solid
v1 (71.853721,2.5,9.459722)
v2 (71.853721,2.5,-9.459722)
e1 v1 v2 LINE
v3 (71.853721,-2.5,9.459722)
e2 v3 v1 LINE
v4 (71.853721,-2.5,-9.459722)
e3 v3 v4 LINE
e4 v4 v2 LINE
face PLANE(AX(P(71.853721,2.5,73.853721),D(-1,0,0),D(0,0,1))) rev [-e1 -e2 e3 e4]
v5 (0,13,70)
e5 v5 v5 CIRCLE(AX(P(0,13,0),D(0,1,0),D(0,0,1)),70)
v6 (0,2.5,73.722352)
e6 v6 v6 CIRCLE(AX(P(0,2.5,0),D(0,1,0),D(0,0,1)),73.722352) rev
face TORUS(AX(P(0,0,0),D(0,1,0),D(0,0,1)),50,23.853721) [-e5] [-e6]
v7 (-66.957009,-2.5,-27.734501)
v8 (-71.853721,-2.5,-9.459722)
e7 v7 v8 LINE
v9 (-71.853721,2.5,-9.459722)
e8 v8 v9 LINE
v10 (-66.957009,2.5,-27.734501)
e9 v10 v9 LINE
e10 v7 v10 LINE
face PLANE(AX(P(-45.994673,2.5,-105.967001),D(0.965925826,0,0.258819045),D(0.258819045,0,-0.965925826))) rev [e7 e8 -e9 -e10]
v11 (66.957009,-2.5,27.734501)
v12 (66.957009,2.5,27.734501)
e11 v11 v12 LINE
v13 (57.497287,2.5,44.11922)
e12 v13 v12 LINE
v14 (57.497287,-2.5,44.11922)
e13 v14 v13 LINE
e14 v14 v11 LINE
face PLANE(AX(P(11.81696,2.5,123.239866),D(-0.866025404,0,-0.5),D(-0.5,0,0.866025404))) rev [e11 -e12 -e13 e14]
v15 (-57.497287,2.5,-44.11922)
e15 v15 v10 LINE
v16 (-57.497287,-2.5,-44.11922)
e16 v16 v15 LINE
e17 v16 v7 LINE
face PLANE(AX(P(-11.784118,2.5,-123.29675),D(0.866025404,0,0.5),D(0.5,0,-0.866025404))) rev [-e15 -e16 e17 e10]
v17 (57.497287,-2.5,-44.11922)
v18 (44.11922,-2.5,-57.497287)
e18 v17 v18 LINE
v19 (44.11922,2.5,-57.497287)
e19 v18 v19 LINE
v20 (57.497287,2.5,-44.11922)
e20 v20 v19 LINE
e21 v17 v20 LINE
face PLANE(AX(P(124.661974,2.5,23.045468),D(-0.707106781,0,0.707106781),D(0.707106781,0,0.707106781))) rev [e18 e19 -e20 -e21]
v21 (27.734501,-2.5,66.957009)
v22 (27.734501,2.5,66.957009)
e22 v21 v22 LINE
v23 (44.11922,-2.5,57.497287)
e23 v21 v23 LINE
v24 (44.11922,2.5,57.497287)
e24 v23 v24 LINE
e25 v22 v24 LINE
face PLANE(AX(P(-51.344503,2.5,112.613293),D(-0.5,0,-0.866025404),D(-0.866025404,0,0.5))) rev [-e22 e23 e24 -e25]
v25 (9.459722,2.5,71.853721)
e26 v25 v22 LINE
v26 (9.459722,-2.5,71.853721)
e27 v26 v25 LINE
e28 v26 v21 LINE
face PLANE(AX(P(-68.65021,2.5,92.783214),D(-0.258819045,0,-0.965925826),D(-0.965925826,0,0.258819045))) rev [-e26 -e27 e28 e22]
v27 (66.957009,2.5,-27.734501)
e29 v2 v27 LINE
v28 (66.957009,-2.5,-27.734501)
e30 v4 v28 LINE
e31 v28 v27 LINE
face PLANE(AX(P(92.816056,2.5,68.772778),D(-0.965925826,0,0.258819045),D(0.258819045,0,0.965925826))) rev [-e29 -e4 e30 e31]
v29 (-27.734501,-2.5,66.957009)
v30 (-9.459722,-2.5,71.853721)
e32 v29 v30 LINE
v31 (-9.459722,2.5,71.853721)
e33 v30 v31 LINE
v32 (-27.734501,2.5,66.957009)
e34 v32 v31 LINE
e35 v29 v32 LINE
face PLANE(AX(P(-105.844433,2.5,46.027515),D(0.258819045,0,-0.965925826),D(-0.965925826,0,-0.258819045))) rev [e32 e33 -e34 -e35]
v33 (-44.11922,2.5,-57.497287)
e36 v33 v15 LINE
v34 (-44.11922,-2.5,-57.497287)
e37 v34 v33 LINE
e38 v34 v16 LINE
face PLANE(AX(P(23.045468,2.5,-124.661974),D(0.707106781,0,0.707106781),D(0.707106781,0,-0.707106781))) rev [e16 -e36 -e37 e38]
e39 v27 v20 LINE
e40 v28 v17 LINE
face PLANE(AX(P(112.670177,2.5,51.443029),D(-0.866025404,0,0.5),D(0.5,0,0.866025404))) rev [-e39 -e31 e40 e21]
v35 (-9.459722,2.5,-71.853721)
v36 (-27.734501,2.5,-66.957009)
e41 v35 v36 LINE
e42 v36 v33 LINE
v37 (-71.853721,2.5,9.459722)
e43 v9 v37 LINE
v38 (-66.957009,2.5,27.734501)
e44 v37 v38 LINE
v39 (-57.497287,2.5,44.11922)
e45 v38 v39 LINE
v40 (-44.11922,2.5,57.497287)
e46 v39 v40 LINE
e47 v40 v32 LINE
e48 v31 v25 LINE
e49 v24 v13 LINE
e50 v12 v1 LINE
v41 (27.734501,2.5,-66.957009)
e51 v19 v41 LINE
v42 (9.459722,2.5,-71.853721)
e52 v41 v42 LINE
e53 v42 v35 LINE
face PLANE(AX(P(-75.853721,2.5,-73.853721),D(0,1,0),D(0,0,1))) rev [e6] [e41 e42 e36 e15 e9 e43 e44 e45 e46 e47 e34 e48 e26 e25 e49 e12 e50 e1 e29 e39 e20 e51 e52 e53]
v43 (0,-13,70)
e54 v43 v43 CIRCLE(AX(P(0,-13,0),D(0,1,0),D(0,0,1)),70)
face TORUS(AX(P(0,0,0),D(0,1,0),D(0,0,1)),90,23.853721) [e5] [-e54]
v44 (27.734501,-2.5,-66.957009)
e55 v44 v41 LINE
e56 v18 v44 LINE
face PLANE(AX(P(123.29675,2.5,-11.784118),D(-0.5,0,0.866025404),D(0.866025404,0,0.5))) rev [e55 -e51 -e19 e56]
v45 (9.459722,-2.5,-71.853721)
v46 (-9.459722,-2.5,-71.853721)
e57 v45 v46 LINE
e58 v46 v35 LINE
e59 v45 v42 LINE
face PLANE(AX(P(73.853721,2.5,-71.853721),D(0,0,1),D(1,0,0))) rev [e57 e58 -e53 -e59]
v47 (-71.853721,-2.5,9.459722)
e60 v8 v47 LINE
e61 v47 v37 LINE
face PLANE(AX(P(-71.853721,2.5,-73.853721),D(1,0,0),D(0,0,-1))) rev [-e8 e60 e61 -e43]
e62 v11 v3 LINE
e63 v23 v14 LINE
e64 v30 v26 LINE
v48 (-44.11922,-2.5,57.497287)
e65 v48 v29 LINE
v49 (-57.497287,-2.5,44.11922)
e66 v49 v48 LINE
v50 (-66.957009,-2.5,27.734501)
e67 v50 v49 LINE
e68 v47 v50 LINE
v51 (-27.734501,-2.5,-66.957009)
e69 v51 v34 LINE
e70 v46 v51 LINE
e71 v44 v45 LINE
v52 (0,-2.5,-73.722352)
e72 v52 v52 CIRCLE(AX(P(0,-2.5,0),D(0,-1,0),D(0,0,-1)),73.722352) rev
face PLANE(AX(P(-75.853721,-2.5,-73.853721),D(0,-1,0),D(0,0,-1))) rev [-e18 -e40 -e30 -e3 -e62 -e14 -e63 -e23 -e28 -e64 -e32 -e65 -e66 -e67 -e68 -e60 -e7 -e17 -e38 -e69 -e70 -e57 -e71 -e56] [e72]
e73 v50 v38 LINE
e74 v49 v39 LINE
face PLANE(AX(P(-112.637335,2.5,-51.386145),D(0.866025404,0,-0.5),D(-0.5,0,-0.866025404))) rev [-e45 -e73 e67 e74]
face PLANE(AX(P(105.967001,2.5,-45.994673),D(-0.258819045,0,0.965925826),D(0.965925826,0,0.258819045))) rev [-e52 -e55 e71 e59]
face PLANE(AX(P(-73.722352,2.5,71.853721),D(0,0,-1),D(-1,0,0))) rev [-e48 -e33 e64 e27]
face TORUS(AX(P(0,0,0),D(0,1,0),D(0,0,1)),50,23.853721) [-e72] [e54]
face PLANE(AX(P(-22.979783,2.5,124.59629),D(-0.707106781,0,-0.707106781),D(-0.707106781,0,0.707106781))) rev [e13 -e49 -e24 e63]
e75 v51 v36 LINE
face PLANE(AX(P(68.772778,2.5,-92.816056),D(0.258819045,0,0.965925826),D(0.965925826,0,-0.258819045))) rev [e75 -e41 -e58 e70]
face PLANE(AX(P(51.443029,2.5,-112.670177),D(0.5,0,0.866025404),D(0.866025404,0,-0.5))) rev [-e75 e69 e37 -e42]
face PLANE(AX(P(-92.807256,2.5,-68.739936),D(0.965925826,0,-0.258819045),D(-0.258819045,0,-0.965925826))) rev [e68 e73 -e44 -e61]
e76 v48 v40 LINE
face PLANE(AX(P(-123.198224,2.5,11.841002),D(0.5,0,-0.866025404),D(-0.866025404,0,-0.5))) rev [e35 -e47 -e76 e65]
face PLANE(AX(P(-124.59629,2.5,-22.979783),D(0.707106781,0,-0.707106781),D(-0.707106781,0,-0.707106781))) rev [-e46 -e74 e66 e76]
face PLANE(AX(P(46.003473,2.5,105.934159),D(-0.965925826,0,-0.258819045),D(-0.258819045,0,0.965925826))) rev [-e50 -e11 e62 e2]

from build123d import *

# Parameters (mm, degrees)
SKETCH5_W          = 4
SKETCH5_H          = 5
CUT_EXTRUDE1_DEPTH = 106.250863209
CIRPATTERN1_START  = -2.5
CIRPATTERN1_DEPTH  = 5


# Read off the part's stored shape, not the designer's step: CirPattern1
with BuildPart() as part:
    # Sketch4 → Revolve1 (revolve)
    with BuildSketch(Plane(origin=(0, 0, 0), x_dir=(0, 0, -1), z_dir=(1, 0, 0))):
        with BuildLine():
            ThreePointArc((-70, -13), (-66.146279116, 0), (-70, 13))
            ThreePointArc((-70, 13), (-73.853720884, 0), (-70, -13))
        make_face()
    revolve(axis=Axis((0, 13, 0), (0, -1, 0)))

    # Sketch5 → Cut-Extrude1 (cut, symmetric)
    with BuildSketch(Plane.XY):
        with Locations((-73.853720884, 0)):
            Rectangle(SKETCH5_W, SKETCH5_H)
    extrude(amount=CUT_EXTRUDE1_DEPTH, both=True, mode=Mode.SUBTRACT)

    # CirPattern1 outline → CirPattern1 (cut)
    with BuildSketch(Plane(origin=(0, 0, 0), x_dir=(1, 0, 0), z_dir=(0, 1, 0)).offset(CIRPATTERN1_START)):
        Polygon((-57.497286734, -44.119219847), (-66.957008549, -27.734501037), (-71.853720884, -9.459721815), (-71.853720884, -75), (75, -75), (75, 75), (-71.853720884, 75), (-71.853720884, 9.459721815), (-66.957008549, 27.734501037), (-57.497286734, 44.119219847), (-44.119219847, 57.497286734), (-27.734501037, 66.957008549), (-9.459721815, 71.853720884), (9.459721815, 71.853720884), (27.734501037, 66.957008549), (44.119219847, 57.497286734), (57.497286734, 44.119219847), (66.957008549, 27.734501037), (71.853720884, 9.459721815), (71.853720884, -9.459721815), (66.957008549, -27.734501037), (57.497286734, -44.119219847), (44.119219847, -57.497286734), (27.734501037, -66.957008549), (9.459721815, -71.853720884), (-9.459721815, -71.853720884), (-27.734501037, -66.957008549), (-44.119219847, -57.497286734), align=None)
    extrude(amount=CIRPATTERN1_DEPTH, mode=Mode.SUBTRACT)


solid = part.part
